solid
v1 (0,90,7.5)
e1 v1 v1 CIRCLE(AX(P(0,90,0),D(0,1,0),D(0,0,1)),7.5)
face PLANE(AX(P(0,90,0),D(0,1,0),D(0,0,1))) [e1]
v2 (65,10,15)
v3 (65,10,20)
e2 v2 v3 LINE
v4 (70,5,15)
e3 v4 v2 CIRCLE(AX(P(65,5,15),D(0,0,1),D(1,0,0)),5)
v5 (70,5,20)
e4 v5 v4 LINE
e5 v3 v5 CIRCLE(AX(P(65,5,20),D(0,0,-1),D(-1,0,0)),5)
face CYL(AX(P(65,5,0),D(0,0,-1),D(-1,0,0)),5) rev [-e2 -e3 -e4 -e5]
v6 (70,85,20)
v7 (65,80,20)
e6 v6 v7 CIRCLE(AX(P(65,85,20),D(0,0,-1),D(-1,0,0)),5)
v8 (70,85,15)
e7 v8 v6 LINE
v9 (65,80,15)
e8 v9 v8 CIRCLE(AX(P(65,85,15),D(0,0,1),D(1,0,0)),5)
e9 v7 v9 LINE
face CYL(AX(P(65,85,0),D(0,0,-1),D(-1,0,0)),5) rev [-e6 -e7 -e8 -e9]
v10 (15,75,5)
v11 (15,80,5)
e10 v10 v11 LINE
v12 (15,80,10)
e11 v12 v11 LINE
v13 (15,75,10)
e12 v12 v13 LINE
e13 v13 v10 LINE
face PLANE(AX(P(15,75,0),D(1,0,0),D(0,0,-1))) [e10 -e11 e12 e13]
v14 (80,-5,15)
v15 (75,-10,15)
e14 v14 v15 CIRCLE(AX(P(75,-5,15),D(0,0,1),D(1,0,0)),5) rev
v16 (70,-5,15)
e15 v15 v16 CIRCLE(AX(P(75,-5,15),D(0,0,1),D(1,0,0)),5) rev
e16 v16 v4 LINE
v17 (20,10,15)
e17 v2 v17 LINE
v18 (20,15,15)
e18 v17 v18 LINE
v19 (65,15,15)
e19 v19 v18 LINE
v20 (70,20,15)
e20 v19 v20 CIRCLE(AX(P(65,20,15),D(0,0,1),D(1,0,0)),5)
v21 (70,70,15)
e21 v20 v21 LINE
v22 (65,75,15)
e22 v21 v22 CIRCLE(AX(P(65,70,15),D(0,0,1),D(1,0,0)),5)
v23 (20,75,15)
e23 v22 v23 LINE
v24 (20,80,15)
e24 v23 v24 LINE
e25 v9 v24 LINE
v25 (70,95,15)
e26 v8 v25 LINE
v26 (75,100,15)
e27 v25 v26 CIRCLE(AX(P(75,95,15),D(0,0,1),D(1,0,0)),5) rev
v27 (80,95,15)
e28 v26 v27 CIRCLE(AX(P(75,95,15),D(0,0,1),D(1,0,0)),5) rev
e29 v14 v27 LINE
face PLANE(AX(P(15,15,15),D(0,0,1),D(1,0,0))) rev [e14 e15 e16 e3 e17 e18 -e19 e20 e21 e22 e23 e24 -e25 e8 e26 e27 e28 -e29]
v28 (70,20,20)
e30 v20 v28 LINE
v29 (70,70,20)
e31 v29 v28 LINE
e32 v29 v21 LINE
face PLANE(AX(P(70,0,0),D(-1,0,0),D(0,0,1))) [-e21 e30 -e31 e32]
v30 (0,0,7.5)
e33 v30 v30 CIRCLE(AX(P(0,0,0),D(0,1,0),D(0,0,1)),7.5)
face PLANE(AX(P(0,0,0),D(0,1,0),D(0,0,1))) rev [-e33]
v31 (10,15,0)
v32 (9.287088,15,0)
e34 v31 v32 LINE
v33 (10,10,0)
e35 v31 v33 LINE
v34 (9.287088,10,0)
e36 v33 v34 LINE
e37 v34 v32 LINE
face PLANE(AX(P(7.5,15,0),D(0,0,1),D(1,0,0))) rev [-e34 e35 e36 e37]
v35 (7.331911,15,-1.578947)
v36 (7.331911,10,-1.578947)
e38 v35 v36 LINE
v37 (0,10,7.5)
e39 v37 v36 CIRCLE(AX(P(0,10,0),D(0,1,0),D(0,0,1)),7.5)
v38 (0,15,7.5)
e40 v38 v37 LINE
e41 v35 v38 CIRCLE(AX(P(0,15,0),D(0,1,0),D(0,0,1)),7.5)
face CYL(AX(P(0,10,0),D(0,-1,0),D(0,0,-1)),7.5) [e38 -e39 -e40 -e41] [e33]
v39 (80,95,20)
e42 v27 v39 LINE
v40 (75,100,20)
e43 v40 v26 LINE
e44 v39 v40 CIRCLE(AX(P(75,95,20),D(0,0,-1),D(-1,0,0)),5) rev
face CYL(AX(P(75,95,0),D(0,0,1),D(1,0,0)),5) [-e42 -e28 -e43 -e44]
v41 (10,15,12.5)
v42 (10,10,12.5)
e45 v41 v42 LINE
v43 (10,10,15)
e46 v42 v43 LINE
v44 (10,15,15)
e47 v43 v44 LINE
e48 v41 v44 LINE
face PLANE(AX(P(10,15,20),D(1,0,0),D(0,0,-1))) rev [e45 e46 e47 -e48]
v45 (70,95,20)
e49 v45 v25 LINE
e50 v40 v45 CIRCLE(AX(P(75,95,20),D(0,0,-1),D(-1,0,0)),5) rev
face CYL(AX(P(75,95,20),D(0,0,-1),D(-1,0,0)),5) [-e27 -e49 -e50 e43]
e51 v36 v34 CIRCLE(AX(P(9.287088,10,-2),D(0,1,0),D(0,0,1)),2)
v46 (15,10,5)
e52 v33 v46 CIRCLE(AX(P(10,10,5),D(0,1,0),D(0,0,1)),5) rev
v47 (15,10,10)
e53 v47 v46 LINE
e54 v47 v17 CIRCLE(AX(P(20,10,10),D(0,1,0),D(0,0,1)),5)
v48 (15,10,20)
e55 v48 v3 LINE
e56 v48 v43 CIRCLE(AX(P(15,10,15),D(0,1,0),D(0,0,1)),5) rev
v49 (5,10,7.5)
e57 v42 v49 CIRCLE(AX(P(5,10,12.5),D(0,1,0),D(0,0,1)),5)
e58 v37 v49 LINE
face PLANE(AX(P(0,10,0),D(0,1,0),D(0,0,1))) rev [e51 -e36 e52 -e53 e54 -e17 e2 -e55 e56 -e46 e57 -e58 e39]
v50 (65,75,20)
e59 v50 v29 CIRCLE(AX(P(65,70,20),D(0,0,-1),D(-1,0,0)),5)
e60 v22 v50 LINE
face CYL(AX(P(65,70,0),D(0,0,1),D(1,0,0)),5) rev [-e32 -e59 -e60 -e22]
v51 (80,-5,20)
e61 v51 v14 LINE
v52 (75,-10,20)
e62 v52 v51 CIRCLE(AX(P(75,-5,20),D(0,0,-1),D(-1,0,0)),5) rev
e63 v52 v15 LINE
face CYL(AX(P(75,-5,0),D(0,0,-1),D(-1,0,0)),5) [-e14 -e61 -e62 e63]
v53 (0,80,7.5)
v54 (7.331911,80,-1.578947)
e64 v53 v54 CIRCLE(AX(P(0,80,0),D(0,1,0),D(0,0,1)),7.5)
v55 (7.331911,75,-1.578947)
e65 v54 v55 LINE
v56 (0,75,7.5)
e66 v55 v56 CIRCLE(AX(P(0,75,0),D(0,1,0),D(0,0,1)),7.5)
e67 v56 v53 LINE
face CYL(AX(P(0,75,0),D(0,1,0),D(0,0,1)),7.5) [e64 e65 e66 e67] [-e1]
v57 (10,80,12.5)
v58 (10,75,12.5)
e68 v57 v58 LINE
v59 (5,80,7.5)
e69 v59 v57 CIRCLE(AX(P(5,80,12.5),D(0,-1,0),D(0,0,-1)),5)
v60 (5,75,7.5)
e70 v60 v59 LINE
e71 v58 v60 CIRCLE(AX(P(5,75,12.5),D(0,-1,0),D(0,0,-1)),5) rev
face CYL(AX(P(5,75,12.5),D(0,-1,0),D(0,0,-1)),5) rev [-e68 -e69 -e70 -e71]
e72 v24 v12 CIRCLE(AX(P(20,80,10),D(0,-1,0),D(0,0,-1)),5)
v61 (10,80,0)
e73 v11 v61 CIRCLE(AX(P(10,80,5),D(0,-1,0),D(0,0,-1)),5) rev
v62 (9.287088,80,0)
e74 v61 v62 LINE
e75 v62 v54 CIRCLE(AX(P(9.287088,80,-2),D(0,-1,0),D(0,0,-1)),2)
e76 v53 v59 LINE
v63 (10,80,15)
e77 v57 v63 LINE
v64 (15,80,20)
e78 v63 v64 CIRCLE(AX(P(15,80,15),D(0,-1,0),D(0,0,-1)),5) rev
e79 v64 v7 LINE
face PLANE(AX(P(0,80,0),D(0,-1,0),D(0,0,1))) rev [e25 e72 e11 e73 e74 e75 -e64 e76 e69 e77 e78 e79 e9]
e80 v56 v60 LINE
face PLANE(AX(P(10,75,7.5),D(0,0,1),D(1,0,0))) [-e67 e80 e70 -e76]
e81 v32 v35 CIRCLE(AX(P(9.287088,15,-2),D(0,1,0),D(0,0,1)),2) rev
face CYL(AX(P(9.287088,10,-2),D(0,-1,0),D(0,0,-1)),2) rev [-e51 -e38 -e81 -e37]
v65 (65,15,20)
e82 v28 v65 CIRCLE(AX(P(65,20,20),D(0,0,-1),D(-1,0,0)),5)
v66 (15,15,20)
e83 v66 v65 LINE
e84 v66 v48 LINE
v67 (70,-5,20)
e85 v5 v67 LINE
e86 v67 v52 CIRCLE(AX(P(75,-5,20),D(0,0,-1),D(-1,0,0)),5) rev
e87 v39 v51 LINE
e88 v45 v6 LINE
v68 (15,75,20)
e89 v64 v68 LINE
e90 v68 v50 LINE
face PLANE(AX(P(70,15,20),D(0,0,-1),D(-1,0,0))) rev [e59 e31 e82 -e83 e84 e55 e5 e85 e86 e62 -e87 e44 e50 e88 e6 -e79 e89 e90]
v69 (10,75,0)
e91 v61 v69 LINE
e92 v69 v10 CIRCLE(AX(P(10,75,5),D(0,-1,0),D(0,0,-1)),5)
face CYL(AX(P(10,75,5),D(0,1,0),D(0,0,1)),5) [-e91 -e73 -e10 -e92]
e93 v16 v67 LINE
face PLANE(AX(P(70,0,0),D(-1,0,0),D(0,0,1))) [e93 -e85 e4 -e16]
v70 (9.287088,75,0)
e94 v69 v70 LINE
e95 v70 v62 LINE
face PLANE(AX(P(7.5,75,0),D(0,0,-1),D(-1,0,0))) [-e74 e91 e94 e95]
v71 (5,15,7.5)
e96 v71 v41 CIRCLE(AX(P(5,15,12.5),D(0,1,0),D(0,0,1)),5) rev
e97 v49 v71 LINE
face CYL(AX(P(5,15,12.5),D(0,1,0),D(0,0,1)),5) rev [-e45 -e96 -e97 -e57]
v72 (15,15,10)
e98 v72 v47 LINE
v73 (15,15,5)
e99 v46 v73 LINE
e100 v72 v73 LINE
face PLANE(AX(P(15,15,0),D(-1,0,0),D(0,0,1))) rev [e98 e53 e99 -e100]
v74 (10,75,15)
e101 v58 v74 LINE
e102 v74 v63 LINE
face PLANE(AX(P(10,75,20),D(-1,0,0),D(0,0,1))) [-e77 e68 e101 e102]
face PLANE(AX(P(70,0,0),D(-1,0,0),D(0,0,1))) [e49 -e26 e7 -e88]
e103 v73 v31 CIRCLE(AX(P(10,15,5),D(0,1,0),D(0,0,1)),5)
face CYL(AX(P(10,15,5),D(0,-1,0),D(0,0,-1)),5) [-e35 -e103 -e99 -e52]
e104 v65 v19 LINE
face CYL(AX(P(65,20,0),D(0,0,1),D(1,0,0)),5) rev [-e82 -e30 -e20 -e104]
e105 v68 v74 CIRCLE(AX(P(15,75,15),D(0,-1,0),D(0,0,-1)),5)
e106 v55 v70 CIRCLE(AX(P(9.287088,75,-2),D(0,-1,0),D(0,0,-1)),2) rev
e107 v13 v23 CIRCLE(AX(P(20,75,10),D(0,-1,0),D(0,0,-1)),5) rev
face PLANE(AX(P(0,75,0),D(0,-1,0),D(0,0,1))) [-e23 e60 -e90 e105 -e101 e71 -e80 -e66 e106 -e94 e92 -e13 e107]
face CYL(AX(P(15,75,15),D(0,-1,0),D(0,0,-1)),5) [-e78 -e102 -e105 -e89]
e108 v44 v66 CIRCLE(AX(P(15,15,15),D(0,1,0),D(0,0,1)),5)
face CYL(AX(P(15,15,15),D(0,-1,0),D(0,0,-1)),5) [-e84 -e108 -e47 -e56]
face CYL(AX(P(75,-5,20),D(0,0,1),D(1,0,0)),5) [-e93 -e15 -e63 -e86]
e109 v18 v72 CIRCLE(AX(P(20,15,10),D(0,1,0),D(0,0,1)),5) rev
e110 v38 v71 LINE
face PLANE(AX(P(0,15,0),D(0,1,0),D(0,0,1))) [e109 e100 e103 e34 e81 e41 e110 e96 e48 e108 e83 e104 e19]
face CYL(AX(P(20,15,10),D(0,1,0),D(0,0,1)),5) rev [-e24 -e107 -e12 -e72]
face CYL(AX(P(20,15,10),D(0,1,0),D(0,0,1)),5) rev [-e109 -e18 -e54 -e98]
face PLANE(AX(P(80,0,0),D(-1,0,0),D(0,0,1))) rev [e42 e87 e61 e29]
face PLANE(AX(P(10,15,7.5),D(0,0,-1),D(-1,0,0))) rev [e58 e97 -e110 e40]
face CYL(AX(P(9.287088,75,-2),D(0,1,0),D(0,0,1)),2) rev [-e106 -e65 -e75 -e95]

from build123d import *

# Parameters (mm, degrees)
ESQUISSE2_R        = 7.5
BOSS_EXTRU_1_DEPTH = 10
BOSS_EXTRU_2_DEPTH = 5
CONG_2_R           = 5
CONG_3_R           = 2
ESQUISSE4_W        = 5
ESQUISSE4_H        = 110
BOSS_EXTRU_3_DEPTH = 10
SYM_TRIE3_START    = 75
SYM_TRIE3_DEPTH    = 5
ESQUISSE5_R        = 7.5
BOSS_EXTRU_4_DEPTH = 10
CONG_4_START       = -1.578947368
CONG_4_DEPTH       = 22.578947368
CONG_4_START_2     = 15
CONG_4_2_DEPTH     = 5


with BuildPart() as part:
    # Esquisse2 → Boss.-Extru.1 (new body)
    with BuildSketch(Plane(origin=(0, 0, 0), x_dir=(1, 0, 0), z_dir=(0, 1, 0))):
        with Locations(Location((0, 0, 0), (0, 0, 270))):
            Circle(ESQUISSE2_R)
    extrude(amount=BOSS_EXTRU_1_DEPTH)

    # Esquisse3 → Boss.-Extru.2 (add)
    with BuildSketch(Plane(origin=(0, 10, 0), x_dir=(1, 0, 0), z_dir=(0, 1, 0))):
        with BuildLine():
            Line((15, 0), (15, -15))
            Line((15, -15), (70, -15))
            Line((70, -15), (70, -20))
            Line((70, -20), (10, -20))
            Line((10, -20), (10, -7.5))
            Line((10, -7.5), (0, -7.5))
            ThreePointArc((0, -7.5), (-5.303300859, 5.303300859), (7.5, 0))
            Line((7.5, 0), (15, 0))
        make_face()
    extrude(amount=BOSS_EXTRU_2_DEPTH)

    # Congé2
    cong_2_edges = [part.edges().sort_by_distance(p)[0] for p in [
        (10, 12.5, 20),
        (15, 12.5, 15),
        (15, 12.5, 0),
        (10, 12.5, 7.5),
    ]]
    fillet(cong_2_edges, radius=CONG_2_R)

    # Congé3
    cong_3_edges = [part.edges().sort_by_distance(p)[0] for p in [
        (7.5, 12.5, 0),
    ]]
    fillet(cong_3_edges, radius=CONG_3_R)

    # Esquisse4 → Boss.-Extru.3 (add)
    with BuildSketch(Plane(origin=(70, 0, 0), x_dir=(0, 0, -1), z_dir=(1, 0, 0))):
        with Locations((-17.5, 45)):
            Rectangle(ESQUISSE4_W, ESQUISSE4_H)
    extrude(amount=BOSS_EXTRU_3_DEPTH)

    # Symétrie3: read off the stored shape, not the designer's step
    # Symétrie3 outline → Symétrie3 (add)
    with BuildSketch(Plane(origin=(0, 0, 0), x_dir=(1, 0, 0), z_dir=(0, 1, 0)).offset(SYM_TRIE3_START)):
        with BuildLine():
            ThreePointArc((9.287087811, 0), (8.030526086, 0.44402679), (7.331911429, 1.578947368))
            ThreePointArc((7.331911429, 1.578947368), (-5.834899539, 4.712106468), (0, -7.5))
            Line((0, -7.5), (5, -7.5))
            ThreePointArc((5, -7.5), (8.535533906, -8.964466094), (10, -12.5))
            Line((10, -12.5), (10, -15))
            ThreePointArc((10, -15), (11.464466094, -18.535533906), (15, -20))
            Line((15, -20), (70, -20))
            Line((70, -20), (70, -15))
            Line((70, -15), (20, -15))
            ThreePointArc((20, -15), (16.464466094, -13.535533906), (15, -10))
            Line((15, -10), (15, -5))
            ThreePointArc((15, -5), (13.535533906, -1.464466094), (10, 0))
            Line((10, 0), (9.287087811, 0))
        make_face()
    extrude(amount=SYM_TRIE3_DEPTH)

    # Esquisse5 → Boss.-Extru.4 (add)
    with BuildSketch(Plane(origin=(0, 80, 0), x_dir=(1, 0, 0), z_dir=(0, 1, 0))):
        with Locations(Location((0, 0, 0), (0, 0, 270))):
            Circle(ESQUISSE5_R)
    extrude(amount=BOSS_EXTRU_4_DEPTH)

    # Congé4: read off the stored shape, not the designer's step
    # Congé4 outline → Congé4 (cut)
    with BuildSketch(Plane.XY.offset(CONG_4_START)):
        with BuildLine():
            Line((70, -10), (75, -10))
            ThreePointArc((75, -10), (71.464466094, -8.535533906), (70, -5))
            Line((70, -5), (70, -10))
        make_face()
        with BuildLine():
            Line((80, -10), (80, -5))
            ThreePointArc((80, -5), (78.535533906, -8.535533906), (75, -10))
            Line((75, -10), (80, -10))
        make_face()
        with BuildLine():
            Line((80, 100), (75, 100))
            ThreePointArc((75, 100), (78.535533906, 98.535533906), (80, 95))
            Line((80, 95), (80, 100))
        make_face()
        with BuildLine():
            Line((70, 100), (70, 95))
            ThreePointArc((70, 95), (71.464466094, 98.535533906), (75, 100))
            Line((75, 100), (70, 100))
        make_face()
    extrude(amount=CONG_4_DEPTH, mode=Mode.SUBTRACT)

    # Cong_4 2 outline → Cong_4 2 (add)
    with BuildSketch(Plane.XY.offset(CONG_4_START_2)):
        with BuildLine():
            Line((70, 15), (70, 20))
            ThreePointArc((70, 20), (68.535533906, 16.464466094), (65, 15))
            Line((65, 15), (70, 15))
        make_face()
        with BuildLine():
            ThreePointArc((65, 75), (68.535533906, 73.535533906), (70, 70))
            Line((70, 70), (70, 75))
            Line((70, 75), (65, 75))
        make_face()
        with BuildLine():
            Line((70, 80), (70, 85))
            ThreePointArc((70, 85), (68.535533906, 81.464466094), (65, 80))
            Line((65, 80), (70, 80))
        make_face()
        with BuildLine():
            ThreePointArc((65, 10), (68.535533906, 8.535533906), (70, 5))
            Line((70, 5), (70, 10))
            Line((70, 10), (65, 10))
        make_face()
    extrude(amount=CONG_4_2_DEPTH)


solid = part.part
